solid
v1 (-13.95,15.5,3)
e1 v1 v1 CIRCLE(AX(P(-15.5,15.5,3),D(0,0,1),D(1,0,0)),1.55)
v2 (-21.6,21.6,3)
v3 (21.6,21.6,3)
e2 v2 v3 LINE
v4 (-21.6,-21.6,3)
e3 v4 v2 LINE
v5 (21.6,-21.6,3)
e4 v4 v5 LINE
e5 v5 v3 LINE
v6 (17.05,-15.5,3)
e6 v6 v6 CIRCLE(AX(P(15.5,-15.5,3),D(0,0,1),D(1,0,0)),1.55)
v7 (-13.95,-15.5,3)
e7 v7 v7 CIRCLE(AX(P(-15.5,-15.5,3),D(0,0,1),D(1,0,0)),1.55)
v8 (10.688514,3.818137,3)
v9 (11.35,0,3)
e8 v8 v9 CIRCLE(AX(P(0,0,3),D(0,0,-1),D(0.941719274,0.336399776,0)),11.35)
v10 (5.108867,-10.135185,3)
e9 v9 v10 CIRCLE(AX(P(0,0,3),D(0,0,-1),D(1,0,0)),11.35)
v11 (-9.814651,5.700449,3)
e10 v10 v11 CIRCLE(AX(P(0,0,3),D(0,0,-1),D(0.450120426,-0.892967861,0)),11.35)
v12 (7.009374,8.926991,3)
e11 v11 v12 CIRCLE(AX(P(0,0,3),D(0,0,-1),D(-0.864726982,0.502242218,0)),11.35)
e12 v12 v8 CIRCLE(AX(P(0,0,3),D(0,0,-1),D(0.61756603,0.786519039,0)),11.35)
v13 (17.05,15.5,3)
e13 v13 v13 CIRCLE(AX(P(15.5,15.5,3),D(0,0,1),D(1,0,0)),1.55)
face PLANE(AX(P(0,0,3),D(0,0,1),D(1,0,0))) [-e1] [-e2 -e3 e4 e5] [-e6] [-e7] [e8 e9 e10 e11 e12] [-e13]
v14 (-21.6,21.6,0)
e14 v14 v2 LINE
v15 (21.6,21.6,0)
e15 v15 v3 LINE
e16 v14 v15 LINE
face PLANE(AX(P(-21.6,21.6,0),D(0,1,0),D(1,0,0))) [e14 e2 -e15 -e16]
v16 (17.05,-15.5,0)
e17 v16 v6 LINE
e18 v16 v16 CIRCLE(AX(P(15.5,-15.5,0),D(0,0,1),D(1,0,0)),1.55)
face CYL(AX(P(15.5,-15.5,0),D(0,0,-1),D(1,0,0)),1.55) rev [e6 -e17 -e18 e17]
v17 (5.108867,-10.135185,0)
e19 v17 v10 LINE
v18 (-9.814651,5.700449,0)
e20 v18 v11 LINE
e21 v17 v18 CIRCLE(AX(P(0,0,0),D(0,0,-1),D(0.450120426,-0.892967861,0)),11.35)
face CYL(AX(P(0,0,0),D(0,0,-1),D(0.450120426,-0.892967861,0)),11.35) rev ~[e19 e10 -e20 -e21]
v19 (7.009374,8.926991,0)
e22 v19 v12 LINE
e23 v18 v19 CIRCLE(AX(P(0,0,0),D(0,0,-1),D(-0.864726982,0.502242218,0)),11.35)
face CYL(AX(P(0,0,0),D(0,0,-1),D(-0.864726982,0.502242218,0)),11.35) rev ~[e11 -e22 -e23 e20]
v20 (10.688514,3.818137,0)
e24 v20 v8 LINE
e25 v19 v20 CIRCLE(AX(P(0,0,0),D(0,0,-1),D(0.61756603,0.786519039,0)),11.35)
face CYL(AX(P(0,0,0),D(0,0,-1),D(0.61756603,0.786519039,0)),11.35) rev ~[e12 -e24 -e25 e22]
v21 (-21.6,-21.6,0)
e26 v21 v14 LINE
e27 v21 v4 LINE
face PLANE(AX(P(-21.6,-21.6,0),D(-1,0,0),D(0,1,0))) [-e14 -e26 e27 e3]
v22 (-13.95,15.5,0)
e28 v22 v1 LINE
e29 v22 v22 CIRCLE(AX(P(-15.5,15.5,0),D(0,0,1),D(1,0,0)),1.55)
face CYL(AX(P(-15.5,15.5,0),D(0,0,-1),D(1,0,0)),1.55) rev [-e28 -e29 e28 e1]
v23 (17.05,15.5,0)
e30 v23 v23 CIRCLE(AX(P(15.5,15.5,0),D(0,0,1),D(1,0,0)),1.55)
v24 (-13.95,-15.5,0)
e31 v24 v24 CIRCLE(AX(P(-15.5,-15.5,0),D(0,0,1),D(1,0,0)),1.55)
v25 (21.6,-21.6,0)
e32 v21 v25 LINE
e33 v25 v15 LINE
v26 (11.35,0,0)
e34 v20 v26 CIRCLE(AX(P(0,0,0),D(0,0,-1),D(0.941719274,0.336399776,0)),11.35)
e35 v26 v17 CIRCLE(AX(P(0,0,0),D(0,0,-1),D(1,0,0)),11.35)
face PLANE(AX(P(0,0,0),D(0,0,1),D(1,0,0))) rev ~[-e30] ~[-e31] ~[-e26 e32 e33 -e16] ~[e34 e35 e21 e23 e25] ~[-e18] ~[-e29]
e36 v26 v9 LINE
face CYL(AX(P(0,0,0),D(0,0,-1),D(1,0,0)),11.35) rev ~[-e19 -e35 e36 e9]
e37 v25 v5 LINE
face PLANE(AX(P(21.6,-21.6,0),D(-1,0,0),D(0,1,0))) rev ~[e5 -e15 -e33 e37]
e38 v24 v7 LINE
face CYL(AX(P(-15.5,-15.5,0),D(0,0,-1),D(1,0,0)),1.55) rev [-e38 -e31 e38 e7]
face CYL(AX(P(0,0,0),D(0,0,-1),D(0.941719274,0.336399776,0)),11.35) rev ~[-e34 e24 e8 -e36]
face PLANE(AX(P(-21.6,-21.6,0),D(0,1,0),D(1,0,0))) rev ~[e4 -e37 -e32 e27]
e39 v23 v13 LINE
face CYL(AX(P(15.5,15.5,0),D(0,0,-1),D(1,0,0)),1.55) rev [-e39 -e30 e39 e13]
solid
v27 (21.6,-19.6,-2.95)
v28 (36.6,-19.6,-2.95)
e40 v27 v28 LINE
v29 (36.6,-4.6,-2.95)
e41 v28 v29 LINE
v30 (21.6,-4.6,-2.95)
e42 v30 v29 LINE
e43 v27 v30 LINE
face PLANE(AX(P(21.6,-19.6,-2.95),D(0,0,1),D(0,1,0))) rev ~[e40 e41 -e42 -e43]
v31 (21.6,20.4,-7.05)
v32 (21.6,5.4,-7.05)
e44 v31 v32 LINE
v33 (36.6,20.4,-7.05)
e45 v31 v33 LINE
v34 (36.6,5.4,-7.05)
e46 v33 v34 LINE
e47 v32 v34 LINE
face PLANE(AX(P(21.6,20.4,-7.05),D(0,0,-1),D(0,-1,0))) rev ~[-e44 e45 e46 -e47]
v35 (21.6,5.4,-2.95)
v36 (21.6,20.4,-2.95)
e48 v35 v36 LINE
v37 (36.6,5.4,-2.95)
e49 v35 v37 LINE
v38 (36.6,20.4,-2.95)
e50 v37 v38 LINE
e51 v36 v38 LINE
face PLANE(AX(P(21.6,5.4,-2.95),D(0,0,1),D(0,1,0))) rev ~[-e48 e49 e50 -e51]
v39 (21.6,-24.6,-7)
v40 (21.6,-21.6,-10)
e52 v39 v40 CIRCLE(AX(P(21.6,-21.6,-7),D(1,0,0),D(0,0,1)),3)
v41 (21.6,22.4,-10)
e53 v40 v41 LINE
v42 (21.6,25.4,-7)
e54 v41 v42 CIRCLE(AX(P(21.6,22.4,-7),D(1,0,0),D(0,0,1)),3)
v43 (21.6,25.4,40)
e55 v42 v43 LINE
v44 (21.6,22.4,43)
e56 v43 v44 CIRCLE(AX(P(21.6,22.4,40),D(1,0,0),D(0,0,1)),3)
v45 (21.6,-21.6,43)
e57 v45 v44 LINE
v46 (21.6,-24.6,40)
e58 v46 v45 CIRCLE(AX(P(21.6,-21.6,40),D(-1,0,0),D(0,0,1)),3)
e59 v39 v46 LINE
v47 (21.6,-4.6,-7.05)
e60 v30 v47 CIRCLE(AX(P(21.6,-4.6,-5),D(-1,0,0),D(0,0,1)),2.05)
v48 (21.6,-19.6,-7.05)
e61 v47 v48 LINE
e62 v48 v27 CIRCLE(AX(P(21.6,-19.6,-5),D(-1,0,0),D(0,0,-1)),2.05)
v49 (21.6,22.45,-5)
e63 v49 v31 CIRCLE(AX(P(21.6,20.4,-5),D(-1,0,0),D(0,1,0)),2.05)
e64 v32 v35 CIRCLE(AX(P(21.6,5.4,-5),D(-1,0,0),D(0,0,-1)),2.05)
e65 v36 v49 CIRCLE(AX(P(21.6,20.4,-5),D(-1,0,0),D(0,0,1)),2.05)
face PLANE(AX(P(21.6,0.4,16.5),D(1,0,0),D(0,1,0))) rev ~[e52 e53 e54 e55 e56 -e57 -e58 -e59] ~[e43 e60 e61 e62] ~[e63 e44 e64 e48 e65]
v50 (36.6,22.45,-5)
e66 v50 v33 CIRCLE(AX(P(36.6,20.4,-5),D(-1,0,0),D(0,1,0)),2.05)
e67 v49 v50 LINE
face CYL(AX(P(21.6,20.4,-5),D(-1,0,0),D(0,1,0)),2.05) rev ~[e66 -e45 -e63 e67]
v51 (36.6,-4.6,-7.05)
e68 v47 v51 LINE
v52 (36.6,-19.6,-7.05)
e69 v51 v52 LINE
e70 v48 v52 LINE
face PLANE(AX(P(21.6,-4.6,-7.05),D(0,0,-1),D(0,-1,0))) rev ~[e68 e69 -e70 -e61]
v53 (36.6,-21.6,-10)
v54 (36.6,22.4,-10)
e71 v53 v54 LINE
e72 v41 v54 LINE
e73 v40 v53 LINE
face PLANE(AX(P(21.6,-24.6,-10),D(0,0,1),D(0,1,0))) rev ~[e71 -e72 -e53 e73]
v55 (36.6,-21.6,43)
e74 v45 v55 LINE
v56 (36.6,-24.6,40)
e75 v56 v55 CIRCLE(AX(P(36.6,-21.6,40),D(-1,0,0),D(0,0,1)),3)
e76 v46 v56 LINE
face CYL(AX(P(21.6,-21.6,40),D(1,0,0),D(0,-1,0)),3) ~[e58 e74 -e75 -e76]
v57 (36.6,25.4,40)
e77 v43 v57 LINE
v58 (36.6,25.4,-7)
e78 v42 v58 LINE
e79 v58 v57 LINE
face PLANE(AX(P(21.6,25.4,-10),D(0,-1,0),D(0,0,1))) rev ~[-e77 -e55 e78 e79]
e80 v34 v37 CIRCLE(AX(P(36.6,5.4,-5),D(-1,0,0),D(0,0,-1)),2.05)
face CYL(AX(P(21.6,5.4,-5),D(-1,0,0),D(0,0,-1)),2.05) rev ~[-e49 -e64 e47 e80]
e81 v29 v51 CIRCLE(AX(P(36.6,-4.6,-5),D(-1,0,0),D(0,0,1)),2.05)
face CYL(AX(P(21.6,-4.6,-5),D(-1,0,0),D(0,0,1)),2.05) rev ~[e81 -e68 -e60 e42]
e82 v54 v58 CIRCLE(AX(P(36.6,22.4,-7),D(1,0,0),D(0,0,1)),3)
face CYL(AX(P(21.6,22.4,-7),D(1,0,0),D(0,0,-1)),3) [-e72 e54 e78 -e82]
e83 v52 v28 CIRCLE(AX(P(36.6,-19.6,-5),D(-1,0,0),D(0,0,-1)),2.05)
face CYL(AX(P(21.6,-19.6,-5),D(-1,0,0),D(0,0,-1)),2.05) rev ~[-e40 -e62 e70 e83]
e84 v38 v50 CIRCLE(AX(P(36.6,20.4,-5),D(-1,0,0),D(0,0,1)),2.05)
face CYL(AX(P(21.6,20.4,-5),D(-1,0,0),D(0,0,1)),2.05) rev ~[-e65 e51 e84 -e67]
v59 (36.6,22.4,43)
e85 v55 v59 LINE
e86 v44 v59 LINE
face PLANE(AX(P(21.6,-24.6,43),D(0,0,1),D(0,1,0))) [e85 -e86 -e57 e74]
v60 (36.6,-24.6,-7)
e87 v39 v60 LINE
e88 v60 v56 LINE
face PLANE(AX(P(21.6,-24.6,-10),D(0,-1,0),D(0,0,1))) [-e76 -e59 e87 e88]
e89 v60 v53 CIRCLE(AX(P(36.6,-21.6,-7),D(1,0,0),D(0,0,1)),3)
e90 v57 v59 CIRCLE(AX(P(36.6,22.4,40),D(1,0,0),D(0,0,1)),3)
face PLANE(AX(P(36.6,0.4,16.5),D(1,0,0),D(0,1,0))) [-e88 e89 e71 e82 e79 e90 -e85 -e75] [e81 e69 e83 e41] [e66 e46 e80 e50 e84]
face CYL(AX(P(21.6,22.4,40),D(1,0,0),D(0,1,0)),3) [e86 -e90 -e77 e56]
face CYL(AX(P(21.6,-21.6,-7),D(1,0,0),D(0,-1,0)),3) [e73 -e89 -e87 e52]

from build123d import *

# Parameters (mm, degrees)
F0_W     = 43.2
F0_H     = 43.2
F0_R     = 1.55
F1_DEPTH = 3
F2_W     = 50
F2_H     = 53
F2_R     = 2.3311267536
F3_DEPTH = 15
F4_R     = 3


with BuildPart() as f1:
    # F0 (on Top) → F1 (new body)
    with BuildSketch(Plane.XY):
        Rectangle(F0_W, F0_H)
        with Locations((-15.5, -15.5)):
            Circle(F0_R, mode=Mode.SUBTRACT)
        with Locations((15.5, -15.5)):
            Circle(F0_R, mode=Mode.SUBTRACT)
        with Locations((-15.5, 15.5)):
            Circle(F0_R, mode=Mode.SUBTRACT)
        with BuildLine():
            ThreePointArc((10.6885137593, 3.8181374539), (11.1834058133, 1.9375072686), (11.35, 0))
            ThreePointArc((11.35, 0), (9.6645780725, -5.951338562), (5.1088668406, -10.135185228))
            ThreePointArc((5.1088668406, -10.135185228), (-8.2600200355, -7.7842513457), (-9.8146512505, 5.7004491779))
            ThreePointArc((-9.8146512505, 5.7004491779), (-2.1377646428, 11.1468588549), (7.0093744434, 8.9269910895))
            ThreePointArc((7.0093744434, 8.9269910895), (9.2102610211, 6.6327665362), (10.6885137593, 3.8181374539))
        make_face(mode=Mode.SUBTRACT)
        with Locations((15.5, 15.5)):
            Circle(F0_R, mode=Mode.SUBTRACT)
    extrude(amount=F1_DEPTH)


with BuildPart() as f3:
    # F2 (on face) → F3 (new body)
    with BuildSketch(Plane.YZ.offset(21.6)):
        with Locations((0.4, 16.5)):
            Rectangle(F2_W, F2_H)
        Circle(F2_R, mode=Mode.SUBTRACT)
        with BuildLine():
            ThreePointArc((-19.6, -7.05), (-21.65, -5), (-19.6, -2.95))
            Line((-19.6, -2.95), (-4.6, -2.95))
            Line((-4.6, -2.95), (5.4, -2.95))
            Line((5.4, -2.95), (20.4, -2.95))
            ThreePointArc((20.4, -2.95), (21.8495689014, -3.5504310986), (22.45, -5))
            ThreePointArc((22.45, -5), (21.8495689014, -6.4495689014), (20.4, -7.05))
            Line((20.4, -7.05), (5.4, -7.05))
            Line((5.4, -7.05), (-4.6, -7.05))
            Line((-4.6, -7.05), (-19.6, -7.05))
        make_face(mode=Mode.SUBTRACT)
        with BuildLine():
            Line((5.4, -2.95), (-4.6, -2.95))
            ThreePointArc((-4.6, -2.95), (-2.55, -5), (-4.6, -7.05))
            Line((-4.6, -7.05), (5.4, -7.05))
            ThreePointArc((5.4, -7.05), (3.35, -5), (5.4, -2.95))
        make_face()
        with BuildLine():
            ThreePointArc((-2.3311267536, 0), (0, -2.3311267536), (2.3311267536, 0))
            Line((2.3311267536, 0), (-2.3311267536, 0))
        make_face()
        with BuildLine():
            Line((-2.3311267536, 0), (2.3311267536, 0))
            ThreePointArc((2.3311267536, 0), (0, 2.3311267536), (-2.3311267536, 0))
        make_face()
    extrude(amount=F3_DEPTH)

    # F4
    f4_edges = [f3.edges().sort_by_distance(p)[0] for p in [
        (29.1, 25.4, -10),
        (29.1, -24.6, -10),
        (29.1, 25.4, 43),
        (29.1, -24.6, 43),
    ]]
    fillet(f4_edges, radius=F4_R)


solid = Compound([f1.part, f3.part])
